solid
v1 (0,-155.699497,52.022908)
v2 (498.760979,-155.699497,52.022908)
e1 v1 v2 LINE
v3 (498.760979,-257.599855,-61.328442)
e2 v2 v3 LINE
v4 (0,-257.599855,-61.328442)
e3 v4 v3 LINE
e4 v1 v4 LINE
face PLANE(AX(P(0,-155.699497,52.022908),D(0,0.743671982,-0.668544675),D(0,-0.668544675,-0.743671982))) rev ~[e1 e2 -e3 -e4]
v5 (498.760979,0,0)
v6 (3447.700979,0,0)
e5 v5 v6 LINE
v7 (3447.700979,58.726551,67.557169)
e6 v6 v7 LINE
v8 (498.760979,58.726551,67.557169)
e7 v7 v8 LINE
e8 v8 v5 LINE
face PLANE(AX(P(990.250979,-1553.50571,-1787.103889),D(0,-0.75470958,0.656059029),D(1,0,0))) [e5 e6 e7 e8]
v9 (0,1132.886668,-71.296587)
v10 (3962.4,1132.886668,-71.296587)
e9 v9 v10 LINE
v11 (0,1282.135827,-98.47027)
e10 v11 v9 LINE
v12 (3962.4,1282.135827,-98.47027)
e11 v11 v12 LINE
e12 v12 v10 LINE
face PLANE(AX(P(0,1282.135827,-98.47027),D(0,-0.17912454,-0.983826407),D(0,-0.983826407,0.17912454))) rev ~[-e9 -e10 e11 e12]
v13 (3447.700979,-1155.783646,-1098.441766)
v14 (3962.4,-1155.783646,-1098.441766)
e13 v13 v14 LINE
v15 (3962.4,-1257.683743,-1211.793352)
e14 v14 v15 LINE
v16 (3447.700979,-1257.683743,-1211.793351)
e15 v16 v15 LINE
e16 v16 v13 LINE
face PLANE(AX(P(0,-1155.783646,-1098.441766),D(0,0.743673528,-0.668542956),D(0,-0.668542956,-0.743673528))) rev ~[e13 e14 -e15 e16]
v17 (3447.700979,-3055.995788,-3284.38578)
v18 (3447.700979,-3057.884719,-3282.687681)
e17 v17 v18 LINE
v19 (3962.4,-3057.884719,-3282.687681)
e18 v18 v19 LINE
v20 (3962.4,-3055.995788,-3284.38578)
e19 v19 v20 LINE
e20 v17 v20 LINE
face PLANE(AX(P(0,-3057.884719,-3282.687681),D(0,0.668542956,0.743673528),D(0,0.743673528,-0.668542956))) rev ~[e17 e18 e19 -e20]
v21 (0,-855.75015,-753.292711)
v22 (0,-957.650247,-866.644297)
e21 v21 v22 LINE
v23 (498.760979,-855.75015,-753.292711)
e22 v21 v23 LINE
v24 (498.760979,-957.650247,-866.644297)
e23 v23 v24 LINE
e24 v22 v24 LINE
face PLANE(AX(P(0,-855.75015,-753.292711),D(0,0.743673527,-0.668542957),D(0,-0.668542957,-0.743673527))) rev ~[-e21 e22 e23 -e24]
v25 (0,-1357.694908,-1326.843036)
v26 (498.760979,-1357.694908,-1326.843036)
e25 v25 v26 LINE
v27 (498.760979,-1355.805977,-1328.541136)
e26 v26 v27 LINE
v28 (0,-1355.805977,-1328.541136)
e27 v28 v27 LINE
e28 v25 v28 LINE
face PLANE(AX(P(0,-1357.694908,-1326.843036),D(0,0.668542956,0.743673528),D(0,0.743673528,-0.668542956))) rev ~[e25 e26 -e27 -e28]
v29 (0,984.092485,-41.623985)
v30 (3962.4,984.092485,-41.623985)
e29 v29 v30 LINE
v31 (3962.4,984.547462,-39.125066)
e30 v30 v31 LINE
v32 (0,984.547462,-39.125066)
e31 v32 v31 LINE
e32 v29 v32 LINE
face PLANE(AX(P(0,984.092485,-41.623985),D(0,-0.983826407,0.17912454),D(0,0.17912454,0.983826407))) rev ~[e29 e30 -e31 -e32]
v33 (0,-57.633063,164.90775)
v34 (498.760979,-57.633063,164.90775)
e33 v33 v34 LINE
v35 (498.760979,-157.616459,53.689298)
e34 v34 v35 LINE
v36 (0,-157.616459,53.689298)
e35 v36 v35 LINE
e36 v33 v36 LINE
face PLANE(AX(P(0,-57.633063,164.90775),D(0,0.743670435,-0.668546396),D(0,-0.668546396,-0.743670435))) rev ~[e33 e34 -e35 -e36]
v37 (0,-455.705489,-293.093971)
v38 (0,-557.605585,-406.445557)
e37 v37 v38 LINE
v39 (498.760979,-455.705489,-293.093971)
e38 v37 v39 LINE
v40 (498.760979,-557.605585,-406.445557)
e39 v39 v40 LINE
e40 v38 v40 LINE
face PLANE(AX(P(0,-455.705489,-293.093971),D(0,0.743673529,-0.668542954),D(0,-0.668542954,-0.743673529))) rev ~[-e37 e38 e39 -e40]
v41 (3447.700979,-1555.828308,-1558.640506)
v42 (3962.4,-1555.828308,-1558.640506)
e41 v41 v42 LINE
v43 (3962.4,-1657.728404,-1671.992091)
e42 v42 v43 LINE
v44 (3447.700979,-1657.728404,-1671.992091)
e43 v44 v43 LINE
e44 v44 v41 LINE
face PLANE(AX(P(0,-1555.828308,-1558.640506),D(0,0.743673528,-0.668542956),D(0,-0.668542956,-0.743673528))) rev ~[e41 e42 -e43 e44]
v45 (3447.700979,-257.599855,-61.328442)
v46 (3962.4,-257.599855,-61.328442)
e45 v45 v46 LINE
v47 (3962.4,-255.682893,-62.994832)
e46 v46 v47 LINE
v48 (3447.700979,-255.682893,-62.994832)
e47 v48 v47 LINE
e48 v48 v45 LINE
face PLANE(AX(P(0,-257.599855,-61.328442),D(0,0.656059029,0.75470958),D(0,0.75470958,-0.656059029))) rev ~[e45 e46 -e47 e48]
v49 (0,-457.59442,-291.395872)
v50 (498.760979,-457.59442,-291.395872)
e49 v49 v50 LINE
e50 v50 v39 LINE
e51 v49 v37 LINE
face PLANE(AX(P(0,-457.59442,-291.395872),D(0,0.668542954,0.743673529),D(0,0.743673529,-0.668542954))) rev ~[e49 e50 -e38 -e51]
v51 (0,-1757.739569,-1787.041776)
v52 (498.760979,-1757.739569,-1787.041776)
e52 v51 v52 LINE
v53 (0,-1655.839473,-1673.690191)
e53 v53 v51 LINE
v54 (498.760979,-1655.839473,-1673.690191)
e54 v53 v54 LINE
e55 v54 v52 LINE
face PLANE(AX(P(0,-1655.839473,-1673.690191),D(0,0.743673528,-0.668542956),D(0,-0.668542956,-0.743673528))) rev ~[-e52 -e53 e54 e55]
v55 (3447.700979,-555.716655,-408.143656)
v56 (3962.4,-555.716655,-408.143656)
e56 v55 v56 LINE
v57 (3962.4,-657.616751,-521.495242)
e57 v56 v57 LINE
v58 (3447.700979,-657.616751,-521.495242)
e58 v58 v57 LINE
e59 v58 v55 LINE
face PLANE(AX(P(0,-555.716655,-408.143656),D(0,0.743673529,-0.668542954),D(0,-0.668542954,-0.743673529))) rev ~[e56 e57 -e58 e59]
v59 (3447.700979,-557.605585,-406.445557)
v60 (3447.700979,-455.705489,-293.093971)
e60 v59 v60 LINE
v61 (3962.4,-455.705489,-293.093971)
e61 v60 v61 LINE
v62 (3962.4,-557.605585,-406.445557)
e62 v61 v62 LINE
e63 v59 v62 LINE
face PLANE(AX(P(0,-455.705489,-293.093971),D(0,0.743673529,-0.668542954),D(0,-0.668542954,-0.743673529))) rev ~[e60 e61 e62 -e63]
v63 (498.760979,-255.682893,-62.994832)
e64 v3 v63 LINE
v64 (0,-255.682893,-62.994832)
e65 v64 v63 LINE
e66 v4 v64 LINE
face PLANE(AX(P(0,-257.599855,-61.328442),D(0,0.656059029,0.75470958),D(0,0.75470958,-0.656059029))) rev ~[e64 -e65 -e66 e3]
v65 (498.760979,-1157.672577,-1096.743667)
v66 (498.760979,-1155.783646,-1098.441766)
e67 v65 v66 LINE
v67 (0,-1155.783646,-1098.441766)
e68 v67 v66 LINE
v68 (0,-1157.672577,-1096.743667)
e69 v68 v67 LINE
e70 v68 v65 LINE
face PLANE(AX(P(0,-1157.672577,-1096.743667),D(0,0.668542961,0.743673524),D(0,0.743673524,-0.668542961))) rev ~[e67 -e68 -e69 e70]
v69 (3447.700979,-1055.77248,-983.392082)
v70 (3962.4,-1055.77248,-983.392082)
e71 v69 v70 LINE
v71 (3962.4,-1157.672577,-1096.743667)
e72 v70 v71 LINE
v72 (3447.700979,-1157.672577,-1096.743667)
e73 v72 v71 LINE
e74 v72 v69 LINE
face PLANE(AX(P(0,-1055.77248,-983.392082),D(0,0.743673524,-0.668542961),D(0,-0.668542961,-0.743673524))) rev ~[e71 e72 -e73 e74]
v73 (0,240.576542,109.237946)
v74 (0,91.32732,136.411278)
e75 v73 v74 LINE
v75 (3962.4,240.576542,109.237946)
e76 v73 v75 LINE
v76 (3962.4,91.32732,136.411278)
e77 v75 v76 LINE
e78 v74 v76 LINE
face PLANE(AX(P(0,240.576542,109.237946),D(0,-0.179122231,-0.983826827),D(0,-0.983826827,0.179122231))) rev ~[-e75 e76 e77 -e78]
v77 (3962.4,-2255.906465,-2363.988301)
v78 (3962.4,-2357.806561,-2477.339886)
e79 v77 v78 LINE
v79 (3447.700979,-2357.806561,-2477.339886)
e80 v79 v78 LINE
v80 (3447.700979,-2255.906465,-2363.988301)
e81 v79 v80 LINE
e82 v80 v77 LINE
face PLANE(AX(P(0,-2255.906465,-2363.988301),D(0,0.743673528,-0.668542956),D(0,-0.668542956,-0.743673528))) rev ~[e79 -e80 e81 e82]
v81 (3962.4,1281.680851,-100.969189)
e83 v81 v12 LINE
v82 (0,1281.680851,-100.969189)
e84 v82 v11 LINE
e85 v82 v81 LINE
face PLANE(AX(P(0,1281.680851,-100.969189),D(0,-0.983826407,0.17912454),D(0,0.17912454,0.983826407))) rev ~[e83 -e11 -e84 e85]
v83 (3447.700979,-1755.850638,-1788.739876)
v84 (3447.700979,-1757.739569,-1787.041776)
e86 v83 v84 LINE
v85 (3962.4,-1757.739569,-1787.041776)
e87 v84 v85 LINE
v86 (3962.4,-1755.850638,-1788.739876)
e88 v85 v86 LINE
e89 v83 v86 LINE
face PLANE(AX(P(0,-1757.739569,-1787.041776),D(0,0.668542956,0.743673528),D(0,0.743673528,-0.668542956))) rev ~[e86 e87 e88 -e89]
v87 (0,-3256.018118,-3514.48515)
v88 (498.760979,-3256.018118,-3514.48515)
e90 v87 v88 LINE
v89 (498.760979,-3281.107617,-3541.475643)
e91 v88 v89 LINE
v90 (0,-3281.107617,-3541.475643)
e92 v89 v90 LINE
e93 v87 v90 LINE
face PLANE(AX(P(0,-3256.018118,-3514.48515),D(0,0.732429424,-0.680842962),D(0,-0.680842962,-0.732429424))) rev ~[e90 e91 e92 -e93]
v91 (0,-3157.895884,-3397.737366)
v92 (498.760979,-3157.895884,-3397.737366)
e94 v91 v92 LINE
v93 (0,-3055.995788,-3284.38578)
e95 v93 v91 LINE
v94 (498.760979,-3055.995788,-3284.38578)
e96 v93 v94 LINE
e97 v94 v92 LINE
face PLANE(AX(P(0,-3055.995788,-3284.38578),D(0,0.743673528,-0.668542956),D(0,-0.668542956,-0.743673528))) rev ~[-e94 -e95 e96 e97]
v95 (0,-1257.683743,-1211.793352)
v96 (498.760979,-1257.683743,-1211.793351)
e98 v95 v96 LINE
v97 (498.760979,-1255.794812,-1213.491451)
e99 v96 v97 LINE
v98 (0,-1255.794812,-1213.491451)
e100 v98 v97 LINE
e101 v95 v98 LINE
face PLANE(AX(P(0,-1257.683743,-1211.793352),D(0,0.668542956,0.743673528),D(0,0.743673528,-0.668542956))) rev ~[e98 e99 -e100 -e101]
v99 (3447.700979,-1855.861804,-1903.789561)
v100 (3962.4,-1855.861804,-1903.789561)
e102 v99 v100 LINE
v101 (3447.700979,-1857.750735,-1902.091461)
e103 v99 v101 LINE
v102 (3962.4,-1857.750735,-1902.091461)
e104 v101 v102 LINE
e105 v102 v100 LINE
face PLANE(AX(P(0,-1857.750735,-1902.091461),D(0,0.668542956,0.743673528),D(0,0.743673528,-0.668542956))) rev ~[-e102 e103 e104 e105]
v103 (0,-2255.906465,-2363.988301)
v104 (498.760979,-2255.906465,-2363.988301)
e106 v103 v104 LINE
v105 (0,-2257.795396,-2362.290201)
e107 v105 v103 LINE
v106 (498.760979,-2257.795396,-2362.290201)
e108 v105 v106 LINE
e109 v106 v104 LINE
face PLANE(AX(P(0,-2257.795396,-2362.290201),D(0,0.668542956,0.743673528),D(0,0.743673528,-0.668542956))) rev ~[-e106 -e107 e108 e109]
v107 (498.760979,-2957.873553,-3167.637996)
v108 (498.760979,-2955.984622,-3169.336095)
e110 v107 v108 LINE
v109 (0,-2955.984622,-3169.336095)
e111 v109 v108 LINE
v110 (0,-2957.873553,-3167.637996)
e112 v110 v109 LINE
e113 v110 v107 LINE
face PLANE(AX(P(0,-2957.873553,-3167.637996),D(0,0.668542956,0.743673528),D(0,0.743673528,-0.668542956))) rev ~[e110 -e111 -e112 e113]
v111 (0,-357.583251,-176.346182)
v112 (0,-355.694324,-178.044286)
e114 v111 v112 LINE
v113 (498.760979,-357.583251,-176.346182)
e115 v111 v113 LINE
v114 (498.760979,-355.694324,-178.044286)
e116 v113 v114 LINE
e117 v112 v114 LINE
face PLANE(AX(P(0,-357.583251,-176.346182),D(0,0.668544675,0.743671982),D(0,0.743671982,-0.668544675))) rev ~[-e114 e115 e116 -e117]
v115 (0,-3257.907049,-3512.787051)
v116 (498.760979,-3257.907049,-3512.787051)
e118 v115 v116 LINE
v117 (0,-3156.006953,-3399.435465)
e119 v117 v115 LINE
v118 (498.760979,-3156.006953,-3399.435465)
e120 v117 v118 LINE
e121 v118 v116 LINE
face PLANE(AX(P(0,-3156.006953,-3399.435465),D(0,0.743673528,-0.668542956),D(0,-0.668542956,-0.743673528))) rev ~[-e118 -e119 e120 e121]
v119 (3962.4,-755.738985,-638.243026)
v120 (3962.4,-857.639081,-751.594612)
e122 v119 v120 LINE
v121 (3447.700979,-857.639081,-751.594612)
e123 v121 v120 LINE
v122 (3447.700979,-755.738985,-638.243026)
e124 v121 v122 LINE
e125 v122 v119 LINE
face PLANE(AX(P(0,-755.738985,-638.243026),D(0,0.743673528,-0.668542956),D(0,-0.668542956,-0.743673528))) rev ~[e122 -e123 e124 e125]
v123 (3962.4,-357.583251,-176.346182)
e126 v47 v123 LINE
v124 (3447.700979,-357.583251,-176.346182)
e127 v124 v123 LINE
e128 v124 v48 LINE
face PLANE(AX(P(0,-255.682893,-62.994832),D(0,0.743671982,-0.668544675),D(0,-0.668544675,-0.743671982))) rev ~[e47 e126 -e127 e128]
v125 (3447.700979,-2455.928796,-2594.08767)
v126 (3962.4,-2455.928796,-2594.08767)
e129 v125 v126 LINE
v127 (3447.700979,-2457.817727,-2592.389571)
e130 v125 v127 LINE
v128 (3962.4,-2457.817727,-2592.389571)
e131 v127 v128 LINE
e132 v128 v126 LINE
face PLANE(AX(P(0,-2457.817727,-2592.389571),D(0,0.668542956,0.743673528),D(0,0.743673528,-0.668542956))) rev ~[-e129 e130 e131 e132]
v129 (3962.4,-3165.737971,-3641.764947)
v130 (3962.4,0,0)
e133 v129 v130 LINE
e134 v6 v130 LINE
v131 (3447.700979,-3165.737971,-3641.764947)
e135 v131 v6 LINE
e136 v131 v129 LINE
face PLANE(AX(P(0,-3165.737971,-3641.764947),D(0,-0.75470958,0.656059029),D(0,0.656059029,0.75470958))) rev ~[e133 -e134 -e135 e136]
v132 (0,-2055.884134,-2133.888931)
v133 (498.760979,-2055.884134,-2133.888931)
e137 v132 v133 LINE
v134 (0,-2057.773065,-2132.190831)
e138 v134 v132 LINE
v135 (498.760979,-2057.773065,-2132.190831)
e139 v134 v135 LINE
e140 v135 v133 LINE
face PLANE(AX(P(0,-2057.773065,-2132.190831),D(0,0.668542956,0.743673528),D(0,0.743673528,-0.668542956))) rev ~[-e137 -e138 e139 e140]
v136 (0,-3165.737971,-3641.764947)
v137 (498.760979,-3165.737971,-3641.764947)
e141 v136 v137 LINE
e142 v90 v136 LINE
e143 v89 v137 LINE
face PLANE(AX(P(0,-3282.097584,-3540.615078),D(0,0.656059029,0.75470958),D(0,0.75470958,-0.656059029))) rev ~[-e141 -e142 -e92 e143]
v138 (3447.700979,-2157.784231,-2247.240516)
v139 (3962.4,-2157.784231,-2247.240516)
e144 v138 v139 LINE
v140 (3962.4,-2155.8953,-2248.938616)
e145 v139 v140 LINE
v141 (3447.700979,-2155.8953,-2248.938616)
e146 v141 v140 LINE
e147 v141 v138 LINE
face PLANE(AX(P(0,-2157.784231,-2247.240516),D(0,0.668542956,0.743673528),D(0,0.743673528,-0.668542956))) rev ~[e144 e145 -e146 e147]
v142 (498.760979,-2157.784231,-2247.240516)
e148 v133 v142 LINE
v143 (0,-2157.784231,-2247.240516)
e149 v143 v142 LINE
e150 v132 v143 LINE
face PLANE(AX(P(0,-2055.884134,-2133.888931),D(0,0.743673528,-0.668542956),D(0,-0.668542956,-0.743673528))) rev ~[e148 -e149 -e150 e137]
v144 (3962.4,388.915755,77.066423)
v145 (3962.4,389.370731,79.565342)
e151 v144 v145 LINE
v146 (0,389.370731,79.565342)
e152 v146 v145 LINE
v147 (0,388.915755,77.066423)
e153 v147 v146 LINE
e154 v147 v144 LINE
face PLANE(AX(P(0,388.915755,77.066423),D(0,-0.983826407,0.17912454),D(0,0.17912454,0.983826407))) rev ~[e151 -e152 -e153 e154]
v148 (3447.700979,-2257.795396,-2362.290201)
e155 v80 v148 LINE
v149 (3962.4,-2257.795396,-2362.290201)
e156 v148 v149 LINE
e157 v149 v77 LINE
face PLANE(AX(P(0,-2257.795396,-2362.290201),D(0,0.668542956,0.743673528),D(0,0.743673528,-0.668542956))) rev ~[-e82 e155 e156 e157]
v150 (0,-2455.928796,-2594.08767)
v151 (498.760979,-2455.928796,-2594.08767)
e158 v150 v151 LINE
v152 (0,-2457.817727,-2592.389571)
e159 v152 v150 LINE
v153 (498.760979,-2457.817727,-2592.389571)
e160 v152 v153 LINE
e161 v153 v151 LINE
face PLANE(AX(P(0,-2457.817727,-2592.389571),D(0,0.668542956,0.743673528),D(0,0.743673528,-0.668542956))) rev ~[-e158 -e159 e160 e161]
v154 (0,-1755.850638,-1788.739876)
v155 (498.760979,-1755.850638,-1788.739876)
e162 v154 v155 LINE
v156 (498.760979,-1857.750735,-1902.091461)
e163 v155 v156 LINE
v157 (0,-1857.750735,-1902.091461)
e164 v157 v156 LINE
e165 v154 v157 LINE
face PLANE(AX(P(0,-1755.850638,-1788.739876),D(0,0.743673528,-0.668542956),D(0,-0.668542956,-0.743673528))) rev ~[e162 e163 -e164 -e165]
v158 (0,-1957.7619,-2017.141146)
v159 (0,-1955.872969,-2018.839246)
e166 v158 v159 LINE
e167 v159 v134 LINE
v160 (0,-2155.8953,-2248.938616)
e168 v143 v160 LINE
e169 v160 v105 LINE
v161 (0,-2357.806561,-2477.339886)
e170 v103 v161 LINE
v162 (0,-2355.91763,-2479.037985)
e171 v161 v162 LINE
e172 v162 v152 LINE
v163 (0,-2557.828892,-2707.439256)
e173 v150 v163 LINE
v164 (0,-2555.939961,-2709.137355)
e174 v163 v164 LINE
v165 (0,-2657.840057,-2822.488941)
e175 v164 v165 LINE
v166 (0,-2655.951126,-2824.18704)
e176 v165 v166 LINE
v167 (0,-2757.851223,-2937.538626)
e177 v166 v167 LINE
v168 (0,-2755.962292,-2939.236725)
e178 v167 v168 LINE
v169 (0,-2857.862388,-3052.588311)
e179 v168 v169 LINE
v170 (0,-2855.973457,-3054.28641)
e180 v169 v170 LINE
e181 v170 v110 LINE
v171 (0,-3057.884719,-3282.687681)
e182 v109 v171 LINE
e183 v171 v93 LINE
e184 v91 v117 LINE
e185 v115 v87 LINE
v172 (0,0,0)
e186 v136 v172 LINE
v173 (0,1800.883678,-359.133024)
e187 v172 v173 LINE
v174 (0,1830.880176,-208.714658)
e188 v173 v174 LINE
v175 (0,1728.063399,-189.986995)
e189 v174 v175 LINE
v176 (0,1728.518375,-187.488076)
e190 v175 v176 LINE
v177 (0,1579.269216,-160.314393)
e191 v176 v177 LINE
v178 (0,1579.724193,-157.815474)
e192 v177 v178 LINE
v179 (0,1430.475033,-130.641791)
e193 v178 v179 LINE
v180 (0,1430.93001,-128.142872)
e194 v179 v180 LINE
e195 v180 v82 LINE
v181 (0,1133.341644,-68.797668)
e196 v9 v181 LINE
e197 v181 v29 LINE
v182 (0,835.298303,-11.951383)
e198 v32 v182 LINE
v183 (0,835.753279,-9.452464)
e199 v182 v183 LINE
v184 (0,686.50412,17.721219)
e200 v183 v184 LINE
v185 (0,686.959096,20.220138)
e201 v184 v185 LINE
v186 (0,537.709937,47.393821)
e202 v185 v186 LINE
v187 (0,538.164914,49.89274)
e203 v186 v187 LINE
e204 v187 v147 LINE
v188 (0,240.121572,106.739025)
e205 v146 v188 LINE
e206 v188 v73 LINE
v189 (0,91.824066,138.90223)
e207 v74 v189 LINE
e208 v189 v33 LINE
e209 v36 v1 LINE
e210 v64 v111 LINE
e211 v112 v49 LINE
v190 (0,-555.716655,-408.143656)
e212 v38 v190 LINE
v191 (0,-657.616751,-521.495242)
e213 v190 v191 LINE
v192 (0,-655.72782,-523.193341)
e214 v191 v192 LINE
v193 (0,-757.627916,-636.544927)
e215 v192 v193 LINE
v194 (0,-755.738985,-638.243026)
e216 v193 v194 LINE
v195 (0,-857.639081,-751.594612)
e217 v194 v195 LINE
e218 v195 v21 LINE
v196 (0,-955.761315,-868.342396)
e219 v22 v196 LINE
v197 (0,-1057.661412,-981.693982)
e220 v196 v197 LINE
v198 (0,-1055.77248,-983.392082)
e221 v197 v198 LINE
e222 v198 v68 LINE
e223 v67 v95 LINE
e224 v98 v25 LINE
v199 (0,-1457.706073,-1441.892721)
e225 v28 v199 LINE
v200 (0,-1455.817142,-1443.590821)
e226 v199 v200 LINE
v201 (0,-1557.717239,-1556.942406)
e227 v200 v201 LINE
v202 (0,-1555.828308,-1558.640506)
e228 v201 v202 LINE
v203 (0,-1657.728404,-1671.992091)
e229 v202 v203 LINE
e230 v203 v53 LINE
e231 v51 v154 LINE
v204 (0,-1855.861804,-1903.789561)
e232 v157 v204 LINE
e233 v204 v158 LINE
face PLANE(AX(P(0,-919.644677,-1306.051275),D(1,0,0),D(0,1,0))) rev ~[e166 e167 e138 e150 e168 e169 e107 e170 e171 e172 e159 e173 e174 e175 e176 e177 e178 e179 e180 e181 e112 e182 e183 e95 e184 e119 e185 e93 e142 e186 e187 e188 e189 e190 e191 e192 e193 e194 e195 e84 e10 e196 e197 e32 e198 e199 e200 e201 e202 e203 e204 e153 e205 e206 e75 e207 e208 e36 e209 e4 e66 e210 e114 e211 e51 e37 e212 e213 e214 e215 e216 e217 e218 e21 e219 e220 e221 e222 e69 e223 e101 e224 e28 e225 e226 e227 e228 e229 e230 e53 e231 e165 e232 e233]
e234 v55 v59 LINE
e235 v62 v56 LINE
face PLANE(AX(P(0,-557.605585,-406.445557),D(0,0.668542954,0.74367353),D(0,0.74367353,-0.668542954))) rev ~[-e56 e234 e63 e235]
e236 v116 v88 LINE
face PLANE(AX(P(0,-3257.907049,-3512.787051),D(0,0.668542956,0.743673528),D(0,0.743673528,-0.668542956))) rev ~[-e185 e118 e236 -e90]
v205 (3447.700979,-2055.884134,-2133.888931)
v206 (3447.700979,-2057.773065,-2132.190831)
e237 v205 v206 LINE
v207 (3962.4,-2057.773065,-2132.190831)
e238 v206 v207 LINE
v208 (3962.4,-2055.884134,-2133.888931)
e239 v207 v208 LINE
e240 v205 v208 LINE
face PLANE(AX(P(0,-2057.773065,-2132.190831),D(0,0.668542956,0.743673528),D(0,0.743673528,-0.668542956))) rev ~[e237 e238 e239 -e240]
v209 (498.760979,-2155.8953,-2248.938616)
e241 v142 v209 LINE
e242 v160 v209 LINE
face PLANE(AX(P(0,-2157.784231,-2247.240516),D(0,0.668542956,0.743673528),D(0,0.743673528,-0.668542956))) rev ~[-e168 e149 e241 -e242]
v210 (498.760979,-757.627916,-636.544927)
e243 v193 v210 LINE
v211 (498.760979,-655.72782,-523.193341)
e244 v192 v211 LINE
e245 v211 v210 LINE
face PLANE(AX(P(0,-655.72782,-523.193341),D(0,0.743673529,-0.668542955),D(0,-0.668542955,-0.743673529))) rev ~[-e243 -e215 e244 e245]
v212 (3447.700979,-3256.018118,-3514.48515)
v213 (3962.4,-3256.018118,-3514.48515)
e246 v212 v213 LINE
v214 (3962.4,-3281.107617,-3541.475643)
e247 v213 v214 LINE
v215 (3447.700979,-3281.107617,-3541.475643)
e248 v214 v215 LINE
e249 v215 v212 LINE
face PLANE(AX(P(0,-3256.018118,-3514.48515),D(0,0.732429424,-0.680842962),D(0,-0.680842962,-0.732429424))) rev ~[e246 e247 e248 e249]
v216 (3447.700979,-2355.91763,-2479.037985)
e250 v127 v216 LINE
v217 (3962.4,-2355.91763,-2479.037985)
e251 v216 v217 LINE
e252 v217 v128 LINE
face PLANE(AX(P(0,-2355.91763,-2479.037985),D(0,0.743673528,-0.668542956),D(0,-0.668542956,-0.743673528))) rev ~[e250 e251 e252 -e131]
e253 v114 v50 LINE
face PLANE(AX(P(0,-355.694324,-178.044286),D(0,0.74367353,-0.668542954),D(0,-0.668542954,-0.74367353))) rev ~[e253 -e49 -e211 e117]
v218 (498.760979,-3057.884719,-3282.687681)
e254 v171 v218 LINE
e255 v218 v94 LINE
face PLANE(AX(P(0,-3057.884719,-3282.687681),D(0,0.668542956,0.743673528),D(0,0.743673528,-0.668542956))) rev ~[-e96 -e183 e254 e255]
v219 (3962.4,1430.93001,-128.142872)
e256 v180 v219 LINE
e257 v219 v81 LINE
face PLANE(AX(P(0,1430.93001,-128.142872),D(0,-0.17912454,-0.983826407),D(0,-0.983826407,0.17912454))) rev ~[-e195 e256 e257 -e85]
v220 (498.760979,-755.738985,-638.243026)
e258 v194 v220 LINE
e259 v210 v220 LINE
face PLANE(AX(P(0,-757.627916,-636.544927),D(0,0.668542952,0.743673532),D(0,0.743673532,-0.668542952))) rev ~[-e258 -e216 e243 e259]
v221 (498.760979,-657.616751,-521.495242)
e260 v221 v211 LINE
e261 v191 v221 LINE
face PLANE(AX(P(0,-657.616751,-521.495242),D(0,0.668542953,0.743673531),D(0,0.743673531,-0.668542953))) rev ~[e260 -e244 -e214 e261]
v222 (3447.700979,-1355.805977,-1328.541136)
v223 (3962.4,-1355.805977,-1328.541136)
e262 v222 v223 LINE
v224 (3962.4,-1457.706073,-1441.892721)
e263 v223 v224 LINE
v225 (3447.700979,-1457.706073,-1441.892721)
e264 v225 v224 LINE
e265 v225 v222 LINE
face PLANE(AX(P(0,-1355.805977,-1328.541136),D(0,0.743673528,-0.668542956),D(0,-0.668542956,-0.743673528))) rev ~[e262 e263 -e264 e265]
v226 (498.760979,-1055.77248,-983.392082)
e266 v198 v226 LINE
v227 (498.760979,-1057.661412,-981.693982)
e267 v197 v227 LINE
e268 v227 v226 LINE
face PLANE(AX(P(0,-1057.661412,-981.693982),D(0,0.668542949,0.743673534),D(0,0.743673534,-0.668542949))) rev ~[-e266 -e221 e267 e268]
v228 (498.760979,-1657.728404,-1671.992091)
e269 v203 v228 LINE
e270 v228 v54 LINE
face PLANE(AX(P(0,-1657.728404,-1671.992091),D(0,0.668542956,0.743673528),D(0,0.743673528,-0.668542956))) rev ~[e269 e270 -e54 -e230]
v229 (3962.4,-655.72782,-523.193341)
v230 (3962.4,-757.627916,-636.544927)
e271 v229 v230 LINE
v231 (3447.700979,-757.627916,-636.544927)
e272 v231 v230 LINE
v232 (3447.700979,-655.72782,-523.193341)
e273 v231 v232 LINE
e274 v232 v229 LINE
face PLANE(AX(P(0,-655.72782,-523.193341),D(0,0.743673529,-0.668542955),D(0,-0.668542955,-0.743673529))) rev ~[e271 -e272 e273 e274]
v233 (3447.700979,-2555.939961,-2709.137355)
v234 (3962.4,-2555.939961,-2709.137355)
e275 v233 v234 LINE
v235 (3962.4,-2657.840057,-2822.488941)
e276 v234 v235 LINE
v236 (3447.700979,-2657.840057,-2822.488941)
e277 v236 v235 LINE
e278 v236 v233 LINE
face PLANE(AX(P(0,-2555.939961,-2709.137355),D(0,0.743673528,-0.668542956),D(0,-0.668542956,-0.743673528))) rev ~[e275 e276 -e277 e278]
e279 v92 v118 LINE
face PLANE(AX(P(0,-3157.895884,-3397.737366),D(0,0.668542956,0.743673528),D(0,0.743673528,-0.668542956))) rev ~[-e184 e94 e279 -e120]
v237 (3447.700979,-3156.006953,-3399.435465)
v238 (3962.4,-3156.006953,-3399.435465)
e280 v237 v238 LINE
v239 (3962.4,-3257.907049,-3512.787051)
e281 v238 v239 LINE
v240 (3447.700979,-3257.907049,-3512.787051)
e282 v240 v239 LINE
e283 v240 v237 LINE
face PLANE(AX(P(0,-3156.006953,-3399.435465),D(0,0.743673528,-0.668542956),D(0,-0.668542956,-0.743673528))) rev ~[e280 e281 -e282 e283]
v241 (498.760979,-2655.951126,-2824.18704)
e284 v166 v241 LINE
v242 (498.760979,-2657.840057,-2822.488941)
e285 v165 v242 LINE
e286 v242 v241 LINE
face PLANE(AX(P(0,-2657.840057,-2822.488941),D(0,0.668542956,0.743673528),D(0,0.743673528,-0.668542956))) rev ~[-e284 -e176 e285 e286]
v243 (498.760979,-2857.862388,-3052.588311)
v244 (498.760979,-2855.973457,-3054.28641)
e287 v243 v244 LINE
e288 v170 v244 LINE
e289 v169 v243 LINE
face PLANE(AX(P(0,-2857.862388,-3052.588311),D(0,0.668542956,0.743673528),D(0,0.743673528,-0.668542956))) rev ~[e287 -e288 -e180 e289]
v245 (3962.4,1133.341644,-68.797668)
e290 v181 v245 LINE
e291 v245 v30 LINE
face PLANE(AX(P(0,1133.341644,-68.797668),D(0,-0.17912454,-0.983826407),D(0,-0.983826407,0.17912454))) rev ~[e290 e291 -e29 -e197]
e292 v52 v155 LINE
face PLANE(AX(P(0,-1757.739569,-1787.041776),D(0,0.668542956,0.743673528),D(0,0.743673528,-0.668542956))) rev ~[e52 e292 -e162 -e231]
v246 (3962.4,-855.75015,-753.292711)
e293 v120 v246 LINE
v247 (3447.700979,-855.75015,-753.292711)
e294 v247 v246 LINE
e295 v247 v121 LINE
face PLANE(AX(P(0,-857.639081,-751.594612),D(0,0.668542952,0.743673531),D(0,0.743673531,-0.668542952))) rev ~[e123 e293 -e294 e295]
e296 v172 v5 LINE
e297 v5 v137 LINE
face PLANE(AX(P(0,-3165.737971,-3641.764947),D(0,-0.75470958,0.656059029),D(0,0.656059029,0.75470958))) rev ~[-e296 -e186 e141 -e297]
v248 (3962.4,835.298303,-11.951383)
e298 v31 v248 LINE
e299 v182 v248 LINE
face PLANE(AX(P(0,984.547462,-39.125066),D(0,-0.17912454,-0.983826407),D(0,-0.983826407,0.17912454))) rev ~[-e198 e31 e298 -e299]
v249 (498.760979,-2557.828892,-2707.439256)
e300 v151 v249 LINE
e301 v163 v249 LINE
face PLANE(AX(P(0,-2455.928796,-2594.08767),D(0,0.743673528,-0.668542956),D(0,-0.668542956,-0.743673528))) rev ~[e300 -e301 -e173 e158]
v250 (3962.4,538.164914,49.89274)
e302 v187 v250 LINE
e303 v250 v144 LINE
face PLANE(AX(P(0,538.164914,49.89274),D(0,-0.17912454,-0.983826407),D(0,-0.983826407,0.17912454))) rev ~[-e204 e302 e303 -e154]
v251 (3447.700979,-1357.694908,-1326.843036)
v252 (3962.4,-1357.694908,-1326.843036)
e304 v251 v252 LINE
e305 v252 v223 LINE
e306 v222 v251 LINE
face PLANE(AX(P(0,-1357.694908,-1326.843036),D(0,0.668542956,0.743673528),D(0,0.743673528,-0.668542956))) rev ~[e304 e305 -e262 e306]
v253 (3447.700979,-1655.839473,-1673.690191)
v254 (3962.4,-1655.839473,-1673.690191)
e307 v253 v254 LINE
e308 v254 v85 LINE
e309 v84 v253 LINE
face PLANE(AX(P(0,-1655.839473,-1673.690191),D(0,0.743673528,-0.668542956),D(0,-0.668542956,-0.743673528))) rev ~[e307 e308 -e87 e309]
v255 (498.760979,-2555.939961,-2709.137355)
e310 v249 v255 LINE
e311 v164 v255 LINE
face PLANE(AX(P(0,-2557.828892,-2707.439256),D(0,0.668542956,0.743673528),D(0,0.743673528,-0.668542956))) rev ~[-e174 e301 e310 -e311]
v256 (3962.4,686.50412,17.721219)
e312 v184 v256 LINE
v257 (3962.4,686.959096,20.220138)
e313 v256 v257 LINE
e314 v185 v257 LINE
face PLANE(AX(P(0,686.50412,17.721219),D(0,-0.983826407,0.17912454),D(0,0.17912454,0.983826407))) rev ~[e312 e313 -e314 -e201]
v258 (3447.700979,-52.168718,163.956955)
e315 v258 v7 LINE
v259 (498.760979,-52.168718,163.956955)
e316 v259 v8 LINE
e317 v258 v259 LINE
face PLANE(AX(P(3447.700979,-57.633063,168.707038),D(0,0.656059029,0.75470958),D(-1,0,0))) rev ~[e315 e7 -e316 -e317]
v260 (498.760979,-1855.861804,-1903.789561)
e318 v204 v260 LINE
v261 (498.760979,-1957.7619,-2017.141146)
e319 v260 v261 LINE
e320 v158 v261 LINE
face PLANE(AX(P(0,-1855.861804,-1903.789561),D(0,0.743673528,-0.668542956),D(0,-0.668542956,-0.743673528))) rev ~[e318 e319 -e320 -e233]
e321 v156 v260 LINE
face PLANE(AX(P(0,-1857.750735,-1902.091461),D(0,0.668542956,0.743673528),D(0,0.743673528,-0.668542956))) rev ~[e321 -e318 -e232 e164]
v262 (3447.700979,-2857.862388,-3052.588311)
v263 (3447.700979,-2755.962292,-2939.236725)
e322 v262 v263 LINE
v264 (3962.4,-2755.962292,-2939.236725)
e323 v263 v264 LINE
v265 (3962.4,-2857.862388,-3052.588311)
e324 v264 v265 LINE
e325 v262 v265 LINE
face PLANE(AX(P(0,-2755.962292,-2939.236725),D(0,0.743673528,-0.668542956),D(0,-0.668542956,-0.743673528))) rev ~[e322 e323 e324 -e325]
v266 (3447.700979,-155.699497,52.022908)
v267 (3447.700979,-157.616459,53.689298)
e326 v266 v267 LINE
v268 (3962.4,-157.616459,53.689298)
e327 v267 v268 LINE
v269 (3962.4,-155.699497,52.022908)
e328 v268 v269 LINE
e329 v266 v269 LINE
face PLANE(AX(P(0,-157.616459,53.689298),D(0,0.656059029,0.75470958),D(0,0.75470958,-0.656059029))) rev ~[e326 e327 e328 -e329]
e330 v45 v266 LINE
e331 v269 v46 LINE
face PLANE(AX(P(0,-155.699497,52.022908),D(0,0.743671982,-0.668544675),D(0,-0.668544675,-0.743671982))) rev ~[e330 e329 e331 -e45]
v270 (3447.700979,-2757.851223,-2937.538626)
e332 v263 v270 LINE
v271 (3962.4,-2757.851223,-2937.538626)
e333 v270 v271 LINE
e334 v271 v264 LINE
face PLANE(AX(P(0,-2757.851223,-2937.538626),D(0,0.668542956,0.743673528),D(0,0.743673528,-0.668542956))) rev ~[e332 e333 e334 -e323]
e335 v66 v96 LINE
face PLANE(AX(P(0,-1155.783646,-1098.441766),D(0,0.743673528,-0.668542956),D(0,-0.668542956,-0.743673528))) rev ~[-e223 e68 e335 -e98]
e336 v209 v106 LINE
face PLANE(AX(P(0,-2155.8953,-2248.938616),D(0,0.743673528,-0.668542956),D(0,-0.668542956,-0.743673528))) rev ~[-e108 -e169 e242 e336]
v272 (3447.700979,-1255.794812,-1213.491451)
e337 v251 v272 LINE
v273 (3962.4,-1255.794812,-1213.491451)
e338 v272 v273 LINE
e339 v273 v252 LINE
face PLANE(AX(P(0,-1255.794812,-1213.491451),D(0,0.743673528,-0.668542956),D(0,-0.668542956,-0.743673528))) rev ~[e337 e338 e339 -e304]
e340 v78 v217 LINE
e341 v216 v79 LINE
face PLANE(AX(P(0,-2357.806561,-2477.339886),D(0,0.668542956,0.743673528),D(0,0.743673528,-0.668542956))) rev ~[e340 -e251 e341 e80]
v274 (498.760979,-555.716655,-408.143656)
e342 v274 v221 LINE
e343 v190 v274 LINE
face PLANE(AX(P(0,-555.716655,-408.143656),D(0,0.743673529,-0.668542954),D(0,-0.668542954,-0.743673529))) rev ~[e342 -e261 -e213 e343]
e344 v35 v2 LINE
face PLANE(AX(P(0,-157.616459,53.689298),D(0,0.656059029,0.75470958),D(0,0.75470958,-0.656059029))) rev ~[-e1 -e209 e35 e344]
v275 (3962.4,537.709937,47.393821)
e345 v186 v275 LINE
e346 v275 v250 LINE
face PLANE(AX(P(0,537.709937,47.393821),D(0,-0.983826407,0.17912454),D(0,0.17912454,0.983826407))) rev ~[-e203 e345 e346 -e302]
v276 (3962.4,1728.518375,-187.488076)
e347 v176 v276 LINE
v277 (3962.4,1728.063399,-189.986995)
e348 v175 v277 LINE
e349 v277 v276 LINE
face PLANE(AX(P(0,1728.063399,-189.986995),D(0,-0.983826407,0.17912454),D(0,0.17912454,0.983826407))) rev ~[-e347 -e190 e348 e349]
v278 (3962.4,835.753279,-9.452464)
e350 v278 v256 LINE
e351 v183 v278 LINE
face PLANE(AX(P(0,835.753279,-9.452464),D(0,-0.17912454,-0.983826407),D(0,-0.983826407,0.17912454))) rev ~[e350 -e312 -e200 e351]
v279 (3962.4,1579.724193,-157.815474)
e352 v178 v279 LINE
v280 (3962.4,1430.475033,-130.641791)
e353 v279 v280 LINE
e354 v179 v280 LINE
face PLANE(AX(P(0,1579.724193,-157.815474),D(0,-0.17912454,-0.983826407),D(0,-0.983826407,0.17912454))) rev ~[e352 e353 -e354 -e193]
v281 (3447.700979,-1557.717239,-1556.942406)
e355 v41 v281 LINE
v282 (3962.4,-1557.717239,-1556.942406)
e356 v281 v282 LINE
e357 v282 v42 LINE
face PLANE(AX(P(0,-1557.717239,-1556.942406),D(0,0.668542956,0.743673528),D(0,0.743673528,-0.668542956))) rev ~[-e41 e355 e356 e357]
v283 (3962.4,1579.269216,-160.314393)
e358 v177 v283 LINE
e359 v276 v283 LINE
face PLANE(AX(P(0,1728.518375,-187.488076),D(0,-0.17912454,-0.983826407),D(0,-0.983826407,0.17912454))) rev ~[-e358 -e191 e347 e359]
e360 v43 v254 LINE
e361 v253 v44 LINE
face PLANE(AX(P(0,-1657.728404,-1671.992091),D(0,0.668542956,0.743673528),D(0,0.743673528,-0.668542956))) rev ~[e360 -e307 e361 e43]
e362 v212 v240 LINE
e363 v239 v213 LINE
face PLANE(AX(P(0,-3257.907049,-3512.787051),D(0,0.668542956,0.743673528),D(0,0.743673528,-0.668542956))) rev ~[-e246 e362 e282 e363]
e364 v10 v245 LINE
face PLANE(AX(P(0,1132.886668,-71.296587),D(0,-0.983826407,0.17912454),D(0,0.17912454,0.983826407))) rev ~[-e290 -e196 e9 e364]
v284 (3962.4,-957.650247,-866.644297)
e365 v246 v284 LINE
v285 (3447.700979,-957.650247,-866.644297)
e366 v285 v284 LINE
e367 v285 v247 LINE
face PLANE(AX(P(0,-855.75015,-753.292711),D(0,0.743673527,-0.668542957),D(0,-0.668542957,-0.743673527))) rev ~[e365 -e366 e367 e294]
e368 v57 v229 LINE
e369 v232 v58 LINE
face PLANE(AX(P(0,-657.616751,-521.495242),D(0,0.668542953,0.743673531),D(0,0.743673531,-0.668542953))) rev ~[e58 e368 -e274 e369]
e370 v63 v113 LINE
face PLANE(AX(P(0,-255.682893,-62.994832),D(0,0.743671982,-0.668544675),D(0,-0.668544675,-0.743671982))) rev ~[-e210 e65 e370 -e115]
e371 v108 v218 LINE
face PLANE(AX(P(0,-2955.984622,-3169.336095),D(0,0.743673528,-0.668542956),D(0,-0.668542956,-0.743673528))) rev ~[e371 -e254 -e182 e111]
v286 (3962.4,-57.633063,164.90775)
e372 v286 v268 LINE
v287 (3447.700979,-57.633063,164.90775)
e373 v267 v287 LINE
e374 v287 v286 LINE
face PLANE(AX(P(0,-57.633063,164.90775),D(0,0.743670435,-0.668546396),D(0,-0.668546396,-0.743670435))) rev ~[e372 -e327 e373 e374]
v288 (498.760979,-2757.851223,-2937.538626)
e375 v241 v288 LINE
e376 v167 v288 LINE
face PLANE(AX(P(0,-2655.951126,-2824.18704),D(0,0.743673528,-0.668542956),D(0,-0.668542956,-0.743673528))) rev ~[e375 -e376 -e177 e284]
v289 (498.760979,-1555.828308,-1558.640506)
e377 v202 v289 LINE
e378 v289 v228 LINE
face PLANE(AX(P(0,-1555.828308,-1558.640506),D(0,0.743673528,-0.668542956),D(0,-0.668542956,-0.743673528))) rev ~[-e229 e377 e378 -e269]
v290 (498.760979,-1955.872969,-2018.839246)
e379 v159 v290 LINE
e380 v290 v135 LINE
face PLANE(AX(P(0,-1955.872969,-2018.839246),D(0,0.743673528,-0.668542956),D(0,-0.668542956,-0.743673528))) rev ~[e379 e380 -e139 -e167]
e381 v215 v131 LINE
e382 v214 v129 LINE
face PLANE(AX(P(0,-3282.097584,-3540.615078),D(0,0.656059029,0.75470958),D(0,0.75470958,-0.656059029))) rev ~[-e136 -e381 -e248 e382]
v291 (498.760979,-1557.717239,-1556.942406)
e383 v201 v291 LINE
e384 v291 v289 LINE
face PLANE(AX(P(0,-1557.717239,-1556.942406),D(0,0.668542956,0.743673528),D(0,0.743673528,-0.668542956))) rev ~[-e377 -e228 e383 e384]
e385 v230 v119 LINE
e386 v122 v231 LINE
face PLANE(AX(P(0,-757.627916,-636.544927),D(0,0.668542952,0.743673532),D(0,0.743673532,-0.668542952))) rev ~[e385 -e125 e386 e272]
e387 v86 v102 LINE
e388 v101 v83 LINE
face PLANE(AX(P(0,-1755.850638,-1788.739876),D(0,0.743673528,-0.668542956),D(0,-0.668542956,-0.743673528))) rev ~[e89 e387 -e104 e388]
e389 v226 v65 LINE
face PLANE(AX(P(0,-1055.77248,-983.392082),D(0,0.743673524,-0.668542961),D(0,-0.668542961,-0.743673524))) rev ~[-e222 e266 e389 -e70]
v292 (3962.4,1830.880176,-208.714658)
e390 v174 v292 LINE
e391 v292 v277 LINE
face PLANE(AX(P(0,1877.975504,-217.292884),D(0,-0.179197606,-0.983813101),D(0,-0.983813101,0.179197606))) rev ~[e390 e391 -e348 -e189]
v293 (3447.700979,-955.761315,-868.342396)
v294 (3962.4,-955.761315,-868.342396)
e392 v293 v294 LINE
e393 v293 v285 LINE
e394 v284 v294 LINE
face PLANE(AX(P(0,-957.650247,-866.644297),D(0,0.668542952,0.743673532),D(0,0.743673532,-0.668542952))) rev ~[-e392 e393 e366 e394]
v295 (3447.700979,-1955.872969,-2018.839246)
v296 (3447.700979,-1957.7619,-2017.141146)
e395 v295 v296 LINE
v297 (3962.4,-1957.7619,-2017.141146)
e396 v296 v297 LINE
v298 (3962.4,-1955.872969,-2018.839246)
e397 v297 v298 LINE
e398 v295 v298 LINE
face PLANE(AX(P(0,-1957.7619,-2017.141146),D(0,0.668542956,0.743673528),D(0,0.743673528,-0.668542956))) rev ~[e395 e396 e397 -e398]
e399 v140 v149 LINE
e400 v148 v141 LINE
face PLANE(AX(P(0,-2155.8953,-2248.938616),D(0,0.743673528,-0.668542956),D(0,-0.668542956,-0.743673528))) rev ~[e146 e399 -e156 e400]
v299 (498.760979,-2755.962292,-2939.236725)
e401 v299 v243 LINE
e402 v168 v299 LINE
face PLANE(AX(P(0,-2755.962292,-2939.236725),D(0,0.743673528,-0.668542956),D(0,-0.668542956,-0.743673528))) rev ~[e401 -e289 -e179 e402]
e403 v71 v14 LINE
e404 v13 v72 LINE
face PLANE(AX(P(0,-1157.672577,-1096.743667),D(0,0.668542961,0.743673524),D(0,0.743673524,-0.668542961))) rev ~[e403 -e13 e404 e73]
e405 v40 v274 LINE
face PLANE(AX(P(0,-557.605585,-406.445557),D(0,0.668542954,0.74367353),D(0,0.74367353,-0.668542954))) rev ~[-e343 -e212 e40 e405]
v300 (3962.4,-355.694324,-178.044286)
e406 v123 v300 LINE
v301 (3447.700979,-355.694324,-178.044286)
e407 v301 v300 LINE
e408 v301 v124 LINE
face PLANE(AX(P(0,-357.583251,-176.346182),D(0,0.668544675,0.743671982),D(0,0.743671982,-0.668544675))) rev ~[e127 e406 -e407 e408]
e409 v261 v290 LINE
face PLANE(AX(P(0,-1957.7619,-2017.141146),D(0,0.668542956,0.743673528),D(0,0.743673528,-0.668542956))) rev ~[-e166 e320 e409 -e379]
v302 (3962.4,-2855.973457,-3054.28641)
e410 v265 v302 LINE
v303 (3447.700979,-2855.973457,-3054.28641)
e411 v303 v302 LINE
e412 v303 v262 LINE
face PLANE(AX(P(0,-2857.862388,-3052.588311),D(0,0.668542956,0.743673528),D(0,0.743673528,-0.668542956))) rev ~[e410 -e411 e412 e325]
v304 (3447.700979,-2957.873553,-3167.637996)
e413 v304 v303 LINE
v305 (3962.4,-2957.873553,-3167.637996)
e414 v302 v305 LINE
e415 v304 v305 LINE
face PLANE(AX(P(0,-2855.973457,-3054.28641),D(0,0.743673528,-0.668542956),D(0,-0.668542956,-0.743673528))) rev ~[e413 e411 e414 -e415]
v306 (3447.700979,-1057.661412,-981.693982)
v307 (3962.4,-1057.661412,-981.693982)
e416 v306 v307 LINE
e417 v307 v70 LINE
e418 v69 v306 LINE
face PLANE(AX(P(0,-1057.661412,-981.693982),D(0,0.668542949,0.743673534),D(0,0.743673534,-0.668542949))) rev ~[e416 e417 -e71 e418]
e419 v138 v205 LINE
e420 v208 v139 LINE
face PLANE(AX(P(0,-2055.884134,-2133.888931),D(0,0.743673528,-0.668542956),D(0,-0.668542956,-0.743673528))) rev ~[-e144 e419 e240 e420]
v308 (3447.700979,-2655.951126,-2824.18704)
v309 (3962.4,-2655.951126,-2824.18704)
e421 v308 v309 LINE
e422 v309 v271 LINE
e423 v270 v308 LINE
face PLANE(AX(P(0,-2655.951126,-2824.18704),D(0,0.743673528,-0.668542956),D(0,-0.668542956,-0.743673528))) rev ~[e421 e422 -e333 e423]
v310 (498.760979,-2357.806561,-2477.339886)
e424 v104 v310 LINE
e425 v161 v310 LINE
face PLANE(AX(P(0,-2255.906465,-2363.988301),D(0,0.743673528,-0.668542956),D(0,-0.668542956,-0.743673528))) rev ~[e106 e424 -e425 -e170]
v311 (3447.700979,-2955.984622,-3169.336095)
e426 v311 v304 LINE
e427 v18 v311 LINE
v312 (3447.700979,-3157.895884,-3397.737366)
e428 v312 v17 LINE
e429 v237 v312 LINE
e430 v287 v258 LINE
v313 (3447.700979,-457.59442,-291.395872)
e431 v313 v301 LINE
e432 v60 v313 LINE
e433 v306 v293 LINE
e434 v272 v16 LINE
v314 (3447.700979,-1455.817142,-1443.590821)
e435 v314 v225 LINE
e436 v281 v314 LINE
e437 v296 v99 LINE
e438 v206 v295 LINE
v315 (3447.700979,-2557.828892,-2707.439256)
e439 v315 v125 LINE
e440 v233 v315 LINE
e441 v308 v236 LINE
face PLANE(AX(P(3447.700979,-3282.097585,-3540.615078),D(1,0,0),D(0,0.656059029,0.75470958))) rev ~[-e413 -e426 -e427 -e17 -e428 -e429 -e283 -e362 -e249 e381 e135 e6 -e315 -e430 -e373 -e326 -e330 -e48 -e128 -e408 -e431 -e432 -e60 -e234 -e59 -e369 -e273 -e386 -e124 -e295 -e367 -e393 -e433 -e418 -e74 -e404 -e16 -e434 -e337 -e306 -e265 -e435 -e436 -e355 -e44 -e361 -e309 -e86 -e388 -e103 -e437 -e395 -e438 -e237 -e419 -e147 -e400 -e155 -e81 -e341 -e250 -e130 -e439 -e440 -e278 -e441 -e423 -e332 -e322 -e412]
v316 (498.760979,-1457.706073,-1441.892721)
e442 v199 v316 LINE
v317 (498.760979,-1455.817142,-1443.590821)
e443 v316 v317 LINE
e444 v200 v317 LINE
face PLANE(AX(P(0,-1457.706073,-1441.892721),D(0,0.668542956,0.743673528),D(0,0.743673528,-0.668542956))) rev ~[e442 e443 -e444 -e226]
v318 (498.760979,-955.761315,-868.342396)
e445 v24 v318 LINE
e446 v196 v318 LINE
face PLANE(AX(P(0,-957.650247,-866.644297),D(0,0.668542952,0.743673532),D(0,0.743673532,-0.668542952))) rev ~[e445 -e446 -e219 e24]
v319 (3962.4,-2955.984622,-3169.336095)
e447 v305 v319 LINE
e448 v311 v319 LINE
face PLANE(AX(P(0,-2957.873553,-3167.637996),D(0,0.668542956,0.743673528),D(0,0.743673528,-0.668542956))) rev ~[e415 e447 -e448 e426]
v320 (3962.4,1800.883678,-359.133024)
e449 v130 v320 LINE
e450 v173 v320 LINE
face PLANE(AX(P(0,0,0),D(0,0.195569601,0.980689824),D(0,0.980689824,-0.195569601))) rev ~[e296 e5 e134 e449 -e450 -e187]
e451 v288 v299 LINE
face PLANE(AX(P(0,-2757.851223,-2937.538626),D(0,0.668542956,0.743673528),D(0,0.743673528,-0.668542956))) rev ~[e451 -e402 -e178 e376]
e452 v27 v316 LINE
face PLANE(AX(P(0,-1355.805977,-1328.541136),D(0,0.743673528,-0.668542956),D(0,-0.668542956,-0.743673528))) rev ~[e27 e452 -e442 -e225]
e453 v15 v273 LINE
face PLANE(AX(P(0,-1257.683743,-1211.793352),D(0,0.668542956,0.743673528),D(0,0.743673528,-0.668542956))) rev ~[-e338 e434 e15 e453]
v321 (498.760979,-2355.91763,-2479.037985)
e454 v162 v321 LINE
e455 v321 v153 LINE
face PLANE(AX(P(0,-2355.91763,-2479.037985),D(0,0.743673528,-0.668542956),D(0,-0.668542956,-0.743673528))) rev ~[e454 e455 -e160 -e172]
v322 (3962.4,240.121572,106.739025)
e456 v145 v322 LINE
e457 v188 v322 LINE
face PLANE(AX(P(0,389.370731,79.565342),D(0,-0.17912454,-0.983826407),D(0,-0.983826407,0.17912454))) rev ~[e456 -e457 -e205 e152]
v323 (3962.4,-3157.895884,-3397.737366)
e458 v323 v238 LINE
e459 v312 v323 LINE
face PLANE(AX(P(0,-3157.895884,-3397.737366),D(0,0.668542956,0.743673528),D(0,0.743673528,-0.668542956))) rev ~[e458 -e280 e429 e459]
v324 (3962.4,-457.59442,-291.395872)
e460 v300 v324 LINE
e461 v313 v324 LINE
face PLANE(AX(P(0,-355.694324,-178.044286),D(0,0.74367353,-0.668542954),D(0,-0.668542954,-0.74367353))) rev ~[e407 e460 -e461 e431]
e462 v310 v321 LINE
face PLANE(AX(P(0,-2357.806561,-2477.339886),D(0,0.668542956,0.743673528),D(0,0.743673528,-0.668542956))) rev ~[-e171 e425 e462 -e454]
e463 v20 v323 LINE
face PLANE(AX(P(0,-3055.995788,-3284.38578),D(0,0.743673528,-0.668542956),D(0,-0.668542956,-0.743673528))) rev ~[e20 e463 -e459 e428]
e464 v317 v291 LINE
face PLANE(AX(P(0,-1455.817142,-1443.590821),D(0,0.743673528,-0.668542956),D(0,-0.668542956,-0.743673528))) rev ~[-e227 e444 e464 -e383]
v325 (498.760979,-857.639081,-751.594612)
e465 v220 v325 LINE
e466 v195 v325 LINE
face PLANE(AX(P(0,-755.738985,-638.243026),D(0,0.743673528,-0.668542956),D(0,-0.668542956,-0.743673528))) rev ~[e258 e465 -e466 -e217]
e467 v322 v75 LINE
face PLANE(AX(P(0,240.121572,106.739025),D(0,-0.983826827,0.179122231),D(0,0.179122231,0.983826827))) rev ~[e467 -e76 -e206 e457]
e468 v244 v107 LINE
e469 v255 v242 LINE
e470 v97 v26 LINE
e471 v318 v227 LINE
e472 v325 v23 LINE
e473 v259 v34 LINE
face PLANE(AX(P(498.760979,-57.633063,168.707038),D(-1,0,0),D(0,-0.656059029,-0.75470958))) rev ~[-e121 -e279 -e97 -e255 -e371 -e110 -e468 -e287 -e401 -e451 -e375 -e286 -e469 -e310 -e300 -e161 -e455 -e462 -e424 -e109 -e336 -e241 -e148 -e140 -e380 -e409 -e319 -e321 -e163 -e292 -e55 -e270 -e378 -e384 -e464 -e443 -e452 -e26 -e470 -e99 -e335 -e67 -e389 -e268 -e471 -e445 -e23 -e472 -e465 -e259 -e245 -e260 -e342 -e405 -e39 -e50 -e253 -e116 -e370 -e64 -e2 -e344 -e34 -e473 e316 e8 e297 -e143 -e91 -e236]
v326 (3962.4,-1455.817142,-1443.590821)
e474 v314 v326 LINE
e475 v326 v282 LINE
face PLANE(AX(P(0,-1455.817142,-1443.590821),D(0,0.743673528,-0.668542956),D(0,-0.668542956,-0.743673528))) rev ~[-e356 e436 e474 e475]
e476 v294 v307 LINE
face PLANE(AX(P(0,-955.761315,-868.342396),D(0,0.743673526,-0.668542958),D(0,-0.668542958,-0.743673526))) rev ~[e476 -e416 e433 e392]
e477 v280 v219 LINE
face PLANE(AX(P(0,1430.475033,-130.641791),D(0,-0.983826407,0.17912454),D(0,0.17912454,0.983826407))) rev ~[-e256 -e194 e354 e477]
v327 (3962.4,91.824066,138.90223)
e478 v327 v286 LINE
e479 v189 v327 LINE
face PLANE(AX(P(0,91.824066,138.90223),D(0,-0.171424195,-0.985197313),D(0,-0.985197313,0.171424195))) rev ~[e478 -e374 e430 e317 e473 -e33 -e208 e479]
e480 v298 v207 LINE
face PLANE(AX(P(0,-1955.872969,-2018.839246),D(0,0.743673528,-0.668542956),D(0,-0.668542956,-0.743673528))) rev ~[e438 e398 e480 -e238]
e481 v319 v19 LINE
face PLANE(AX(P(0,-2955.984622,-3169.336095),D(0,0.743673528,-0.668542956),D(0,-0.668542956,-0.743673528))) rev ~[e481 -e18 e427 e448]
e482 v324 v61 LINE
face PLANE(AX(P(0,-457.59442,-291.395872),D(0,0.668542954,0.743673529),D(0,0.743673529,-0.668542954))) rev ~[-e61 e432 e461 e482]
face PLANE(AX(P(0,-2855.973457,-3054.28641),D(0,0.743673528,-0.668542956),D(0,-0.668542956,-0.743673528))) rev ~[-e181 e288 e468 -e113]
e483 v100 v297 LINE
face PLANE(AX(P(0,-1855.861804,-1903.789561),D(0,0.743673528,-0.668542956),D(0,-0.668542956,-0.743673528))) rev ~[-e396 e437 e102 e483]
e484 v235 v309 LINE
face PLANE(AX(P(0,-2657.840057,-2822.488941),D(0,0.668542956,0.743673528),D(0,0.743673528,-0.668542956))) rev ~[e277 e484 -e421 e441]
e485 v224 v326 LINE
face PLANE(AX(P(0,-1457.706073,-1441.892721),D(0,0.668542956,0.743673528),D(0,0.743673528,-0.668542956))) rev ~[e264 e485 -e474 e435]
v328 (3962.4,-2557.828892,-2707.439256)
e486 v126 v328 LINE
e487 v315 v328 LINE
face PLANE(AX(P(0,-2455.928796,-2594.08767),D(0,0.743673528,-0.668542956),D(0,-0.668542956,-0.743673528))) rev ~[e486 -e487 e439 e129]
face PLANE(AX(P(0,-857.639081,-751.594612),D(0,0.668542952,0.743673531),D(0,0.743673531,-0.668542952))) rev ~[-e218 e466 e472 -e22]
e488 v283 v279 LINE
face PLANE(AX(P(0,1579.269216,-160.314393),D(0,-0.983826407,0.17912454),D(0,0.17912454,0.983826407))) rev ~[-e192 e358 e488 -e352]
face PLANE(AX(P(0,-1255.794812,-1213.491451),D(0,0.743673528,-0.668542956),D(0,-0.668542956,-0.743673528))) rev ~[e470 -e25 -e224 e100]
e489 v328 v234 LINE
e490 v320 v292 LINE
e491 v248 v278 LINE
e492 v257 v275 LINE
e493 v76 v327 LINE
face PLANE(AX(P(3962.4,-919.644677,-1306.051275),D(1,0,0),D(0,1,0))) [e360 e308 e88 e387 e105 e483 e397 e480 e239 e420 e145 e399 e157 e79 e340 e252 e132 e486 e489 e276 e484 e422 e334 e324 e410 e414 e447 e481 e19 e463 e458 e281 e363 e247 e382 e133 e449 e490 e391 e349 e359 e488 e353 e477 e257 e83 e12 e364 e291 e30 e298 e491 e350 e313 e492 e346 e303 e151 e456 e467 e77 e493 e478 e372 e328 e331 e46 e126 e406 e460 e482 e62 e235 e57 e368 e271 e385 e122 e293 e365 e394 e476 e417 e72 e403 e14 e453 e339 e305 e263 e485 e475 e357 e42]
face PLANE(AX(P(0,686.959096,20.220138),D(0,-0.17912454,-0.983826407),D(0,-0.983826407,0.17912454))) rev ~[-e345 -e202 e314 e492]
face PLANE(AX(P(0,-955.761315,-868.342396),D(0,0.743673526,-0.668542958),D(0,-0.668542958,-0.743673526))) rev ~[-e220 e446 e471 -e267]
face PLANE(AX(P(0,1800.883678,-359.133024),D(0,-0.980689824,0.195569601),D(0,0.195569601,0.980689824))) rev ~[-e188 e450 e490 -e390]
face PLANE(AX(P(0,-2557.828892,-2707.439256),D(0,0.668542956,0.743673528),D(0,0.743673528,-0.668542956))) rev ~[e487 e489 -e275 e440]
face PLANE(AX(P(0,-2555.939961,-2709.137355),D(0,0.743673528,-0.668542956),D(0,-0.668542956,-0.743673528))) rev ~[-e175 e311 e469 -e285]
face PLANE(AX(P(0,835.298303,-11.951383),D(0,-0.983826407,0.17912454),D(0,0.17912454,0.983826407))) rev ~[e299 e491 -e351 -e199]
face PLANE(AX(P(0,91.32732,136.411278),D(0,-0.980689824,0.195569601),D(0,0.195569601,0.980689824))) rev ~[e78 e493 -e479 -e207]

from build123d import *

# Parameters (mm, degrees)
F1_DEPTH = 3962.4
F2_W     = 982.98
F2_H     = 4914.9
F3_DEPTH = 154.178
F5_DEPTH = 3962.4


# Not quite as in the source:
# - ends of sketch curves that miss each other by under 0.0002 mm in the source are joined


with BuildPart() as f1:
    # F0 (on Right) → F1 (new body)
    with BuildSketch(Plane.YZ):
        Polygon((-1062.7204243511, -1222.520001882), (0, 0), (1800.8836783461, -359.1330239131), (1831.0362082596, -207.9322282015), (-57.6330628745, 168.7070376599), (-3282.0975844599, -3540.615078177), (-3165.7379708004, -3641.7649471487), align=None)
    extrude(amount=F1_DEPTH)

    # F2 (on face) → F3 (cut)
    with BuildSketch(Plane(origin=(0, -116.3596136596, 101.1498689717), x_dir=(1, 0, 0), z_dir=(0, -0.7547095802, 0.656059029))):
        Polygon((1481.7409789185, -4825.3858736942), (1481.7409789185, 89.5141263058), (498.7609789185, 89.5141263058), (498.7609789185, -1548.7858736942), (498.7609789185, -3187.0858736942), (498.7609789185, -4825.3858736942), align=None)
        with Locations((1973.2309789185, -2367.9358736942)):
            Rectangle(F2_W, F2_H)
        with Locations((2956.2109789185, -2367.9358736942)):
            Rectangle(F2_W, F2_H)
    extrude(amount=-F3_DEPTH, mode=Mode.SUBTRACT)

    # F4 (on face) → F5 (cut)
    with BuildSketch(Plane(origin=(0, 0, 0), x_dir=(0, -1, 0), z_dir=(-1, 0, 0))):
        Polygon((3359.7929958838, -3626.122896465), (3257.9070493635, -3512.7870508483), (3256.0181183313, -3514.4851502014), align=None)
        Polygon((-1728.0633988919, -189.9869954259), (-1728.5183752228, -187.4880763519), (-1877.975504427, -217.2928835151), align=None)
        Polygon((157.6164588926, 53.689297634), (57.6330628745, 168.7070376599), (57.6330628745, 164.9077501103), align=None)
        Polygon((57.6330628745, 164.9077501103), (57.6330628745, 168.7070376599), (-91.8240663297, 138.9022304967), align=None)
        Polygon((257.5998549108, -61.328442392), (157.6164588926, 53.689297634), (155.6994965589, 52.0229077003), align=None)
        Polygon((357.5832509291, -176.3461824181), (257.5998549108, -61.328442392), (255.682892577, -62.9948323256), align=None)
        Polygon((457.5944201085, -291.3958718113), (357.5832509291, -176.3461824181), (355.6943240939, -178.0442858929), align=None)
        Polygon((557.6055854343, -406.4455567714), (457.5944201085, -291.3958718113), (455.7054893441, -293.0939709155), align=None)
        Polygon((657.6167507599, -521.4952417314), (557.6055854343, -406.4455567714), (555.7166546943, -408.1436558504), align=None)
        Polygon((757.6279160871, -636.5449266932), (657.6167507599, -521.4952417314), (655.7278198727, -523.1933409397), align=None)
        Polygon((857.6390814104, -751.5946116505), (757.6279160871, -636.5449266932), (755.7389850512, -638.2430260291), align=None)
        Polygon((957.6502467357, -866.64429661), (857.6390814104, -751.5946116505), (855.7501502296, -753.2927111184), align=None)
        Polygon((1057.6614120711, -981.6939815812), (957.6502467357, -866.64429661), (955.7613154081, -868.3423962077), align=None)
        Polygon((1157.6725773853, -1096.743666528), (1057.6614120711, -981.6939815812), (1055.7724803196, -983.3920815471), align=None)
        Polygon((1257.6837427263, -1211.7933515057), (1157.6725773853, -1096.743666528), (1155.7836463636, -1098.4417658929), align=None)
        Polygon((1357.694908057, -1326.8430364714), (1257.6837427263, -1211.7933515057), (1255.7948116941, -1213.4914508588), align=None)
        Polygon((1457.7060733877, -1441.8927214372), (1357.694908057, -1326.8430364714), (1355.8059770247, -1328.5411358246), align=None)
        Polygon((1557.7172387183, -1556.942406403), (1457.7060733877, -1441.8927214372), (1455.8171423554, -1443.5908207904), align=None)
        Polygon((1657.728404049, -1671.9920913688), (1557.7172387183, -1556.942406403), (1555.8283076861, -1558.6405057562), align=None)
        Polygon((1957.7619000458, -2017.1411462715), (1857.7507347135, -1902.0914613039), (1855.8618036813, -1903.7895606571), align=None)
        Polygon((1857.7507347135, -1902.0914613039), (1757.7395693813, -1787.0417763363), (1755.850638349, -1788.7398756895), align=None)
        Polygon((1757.7395693813, -1787.0417763363), (1657.728404049, -1671.9920913688), (1655.8394730168, -1673.6901907219), align=None)
        Polygon((2057.773065378, -2132.1908312391), (1957.7619000458, -2017.1411462715), (1955.8729690135, -2018.8392456247), align=None)
        Polygon((2157.7842307103, -2247.2405162067), (2057.773065378, -2132.1908312391), (2055.8841343458, -2133.8889305922), align=None)
        Polygon((2257.7953960425, -2362.2902011743), (2157.7842307103, -2247.2405162067), (2155.895299678, -2248.9386155598), align=None)
        Polygon((2357.8065613748, -2477.3398861418), (2257.7953960425, -2362.2902011743), (2255.9064650103, -2363.9883005274), align=None)
        Polygon((2457.817726707, -2592.3895711094), (2357.8065613748, -2477.3398861418), (2355.9176303426, -2479.037985495), align=None)
        Polygon((2557.8288920393, -2707.439256077), (2457.817726707, -2592.3895711094), (2455.9287956748, -2594.0876704626), align=None)
        Polygon((2657.8400573716, -2822.4889410446), (2557.8288920393, -2707.439256077), (2555.9399610071, -2709.1373554302), align=None)
        Polygon((2655.9511263393, -2824.1870403977), (2757.8512227038, -2937.5386260122), (2657.8400573716, -2822.4889410446), align=None)
        Polygon((2755.9622916716, -2939.2367253653), (2857.8623880361, -3052.5883109797), (2757.8512227038, -2937.5386260122), align=None)
        Polygon((2855.9734570038, -3054.2864103329), (2957.8735533683, -3167.6379959473), (2857.8623880361, -3052.5883109797), align=None)
        Polygon((2955.9846223361, -3169.3360953005), (3057.8847187006, -3282.6876809149), (2957.8735533683, -3167.6379959473), align=None)
        Polygon((3055.9957876683, -3284.3857802681), (3157.8958840328, -3397.7373658825), (3057.8847187006, -3282.6876809149), align=None)
        Polygon((3156.0069530006, -3399.4354652356), (3257.9070493635, -3512.7870508483), (3157.8958840328, -3397.7373658825), align=None)
        Polygon((-1579.2692161887, -160.3143933487), (-1579.7241925196, -157.8154742747), (-1728.5183752228, -187.4880763519), align=None)
        Polygon((-1430.4750334855, -130.6417912715), (-1430.9300098164, -128.1428721975), (-1579.7241925196, -157.8154742747), align=None)
        Polygon((-1281.6808507823, -100.9691891943), (-1282.1358271132, -98.4702701204), (-1430.9300098164, -128.1428721975), align=None)
        Polygon((-1132.8866680792, -71.2965871171), (-1133.34164441, -68.7976680432), (-1282.1358271132, -98.4702701204), align=None)
        Polygon((-984.092485376, -41.62398504), (-984.5474617069, -39.125065966), (-1133.34164441, -68.7976680432), align=None)
        Polygon((-835.2983026728, -11.9513829628), (-835.7532790037, -9.4524638888), (-984.5474617069, -39.125065966), align=None)
        Polygon((-686.5041199696, 17.7212191144), (-686.9590963005, 20.2201381884), (-835.7532790037, -9.4524638888), align=None)
        Polygon((-537.7099372664, 47.3938211916), (-538.1649135973, 49.8927402656), (-686.9590963005, 20.2201381884), align=None)
        Polygon((-388.9157545632, 77.0664232688), (-389.3707308958, 79.5653423425), (-538.1649135973, 49.8927402656), align=None)
        Polygon((-240.1215718796, 106.7390254439), (-240.5765423462, 109.2379455855), (-389.3707308958, 79.5653423425), align=None)
        Polygon((-91.3273195437, 136.4112783433), (-91.8240663297, 138.9022304967), (-240.5765423462, 109.2379455855), align=None)
    extrude(amount=-F5_DEPTH, mode=Mode.SUBTRACT)


solid = f1.part
